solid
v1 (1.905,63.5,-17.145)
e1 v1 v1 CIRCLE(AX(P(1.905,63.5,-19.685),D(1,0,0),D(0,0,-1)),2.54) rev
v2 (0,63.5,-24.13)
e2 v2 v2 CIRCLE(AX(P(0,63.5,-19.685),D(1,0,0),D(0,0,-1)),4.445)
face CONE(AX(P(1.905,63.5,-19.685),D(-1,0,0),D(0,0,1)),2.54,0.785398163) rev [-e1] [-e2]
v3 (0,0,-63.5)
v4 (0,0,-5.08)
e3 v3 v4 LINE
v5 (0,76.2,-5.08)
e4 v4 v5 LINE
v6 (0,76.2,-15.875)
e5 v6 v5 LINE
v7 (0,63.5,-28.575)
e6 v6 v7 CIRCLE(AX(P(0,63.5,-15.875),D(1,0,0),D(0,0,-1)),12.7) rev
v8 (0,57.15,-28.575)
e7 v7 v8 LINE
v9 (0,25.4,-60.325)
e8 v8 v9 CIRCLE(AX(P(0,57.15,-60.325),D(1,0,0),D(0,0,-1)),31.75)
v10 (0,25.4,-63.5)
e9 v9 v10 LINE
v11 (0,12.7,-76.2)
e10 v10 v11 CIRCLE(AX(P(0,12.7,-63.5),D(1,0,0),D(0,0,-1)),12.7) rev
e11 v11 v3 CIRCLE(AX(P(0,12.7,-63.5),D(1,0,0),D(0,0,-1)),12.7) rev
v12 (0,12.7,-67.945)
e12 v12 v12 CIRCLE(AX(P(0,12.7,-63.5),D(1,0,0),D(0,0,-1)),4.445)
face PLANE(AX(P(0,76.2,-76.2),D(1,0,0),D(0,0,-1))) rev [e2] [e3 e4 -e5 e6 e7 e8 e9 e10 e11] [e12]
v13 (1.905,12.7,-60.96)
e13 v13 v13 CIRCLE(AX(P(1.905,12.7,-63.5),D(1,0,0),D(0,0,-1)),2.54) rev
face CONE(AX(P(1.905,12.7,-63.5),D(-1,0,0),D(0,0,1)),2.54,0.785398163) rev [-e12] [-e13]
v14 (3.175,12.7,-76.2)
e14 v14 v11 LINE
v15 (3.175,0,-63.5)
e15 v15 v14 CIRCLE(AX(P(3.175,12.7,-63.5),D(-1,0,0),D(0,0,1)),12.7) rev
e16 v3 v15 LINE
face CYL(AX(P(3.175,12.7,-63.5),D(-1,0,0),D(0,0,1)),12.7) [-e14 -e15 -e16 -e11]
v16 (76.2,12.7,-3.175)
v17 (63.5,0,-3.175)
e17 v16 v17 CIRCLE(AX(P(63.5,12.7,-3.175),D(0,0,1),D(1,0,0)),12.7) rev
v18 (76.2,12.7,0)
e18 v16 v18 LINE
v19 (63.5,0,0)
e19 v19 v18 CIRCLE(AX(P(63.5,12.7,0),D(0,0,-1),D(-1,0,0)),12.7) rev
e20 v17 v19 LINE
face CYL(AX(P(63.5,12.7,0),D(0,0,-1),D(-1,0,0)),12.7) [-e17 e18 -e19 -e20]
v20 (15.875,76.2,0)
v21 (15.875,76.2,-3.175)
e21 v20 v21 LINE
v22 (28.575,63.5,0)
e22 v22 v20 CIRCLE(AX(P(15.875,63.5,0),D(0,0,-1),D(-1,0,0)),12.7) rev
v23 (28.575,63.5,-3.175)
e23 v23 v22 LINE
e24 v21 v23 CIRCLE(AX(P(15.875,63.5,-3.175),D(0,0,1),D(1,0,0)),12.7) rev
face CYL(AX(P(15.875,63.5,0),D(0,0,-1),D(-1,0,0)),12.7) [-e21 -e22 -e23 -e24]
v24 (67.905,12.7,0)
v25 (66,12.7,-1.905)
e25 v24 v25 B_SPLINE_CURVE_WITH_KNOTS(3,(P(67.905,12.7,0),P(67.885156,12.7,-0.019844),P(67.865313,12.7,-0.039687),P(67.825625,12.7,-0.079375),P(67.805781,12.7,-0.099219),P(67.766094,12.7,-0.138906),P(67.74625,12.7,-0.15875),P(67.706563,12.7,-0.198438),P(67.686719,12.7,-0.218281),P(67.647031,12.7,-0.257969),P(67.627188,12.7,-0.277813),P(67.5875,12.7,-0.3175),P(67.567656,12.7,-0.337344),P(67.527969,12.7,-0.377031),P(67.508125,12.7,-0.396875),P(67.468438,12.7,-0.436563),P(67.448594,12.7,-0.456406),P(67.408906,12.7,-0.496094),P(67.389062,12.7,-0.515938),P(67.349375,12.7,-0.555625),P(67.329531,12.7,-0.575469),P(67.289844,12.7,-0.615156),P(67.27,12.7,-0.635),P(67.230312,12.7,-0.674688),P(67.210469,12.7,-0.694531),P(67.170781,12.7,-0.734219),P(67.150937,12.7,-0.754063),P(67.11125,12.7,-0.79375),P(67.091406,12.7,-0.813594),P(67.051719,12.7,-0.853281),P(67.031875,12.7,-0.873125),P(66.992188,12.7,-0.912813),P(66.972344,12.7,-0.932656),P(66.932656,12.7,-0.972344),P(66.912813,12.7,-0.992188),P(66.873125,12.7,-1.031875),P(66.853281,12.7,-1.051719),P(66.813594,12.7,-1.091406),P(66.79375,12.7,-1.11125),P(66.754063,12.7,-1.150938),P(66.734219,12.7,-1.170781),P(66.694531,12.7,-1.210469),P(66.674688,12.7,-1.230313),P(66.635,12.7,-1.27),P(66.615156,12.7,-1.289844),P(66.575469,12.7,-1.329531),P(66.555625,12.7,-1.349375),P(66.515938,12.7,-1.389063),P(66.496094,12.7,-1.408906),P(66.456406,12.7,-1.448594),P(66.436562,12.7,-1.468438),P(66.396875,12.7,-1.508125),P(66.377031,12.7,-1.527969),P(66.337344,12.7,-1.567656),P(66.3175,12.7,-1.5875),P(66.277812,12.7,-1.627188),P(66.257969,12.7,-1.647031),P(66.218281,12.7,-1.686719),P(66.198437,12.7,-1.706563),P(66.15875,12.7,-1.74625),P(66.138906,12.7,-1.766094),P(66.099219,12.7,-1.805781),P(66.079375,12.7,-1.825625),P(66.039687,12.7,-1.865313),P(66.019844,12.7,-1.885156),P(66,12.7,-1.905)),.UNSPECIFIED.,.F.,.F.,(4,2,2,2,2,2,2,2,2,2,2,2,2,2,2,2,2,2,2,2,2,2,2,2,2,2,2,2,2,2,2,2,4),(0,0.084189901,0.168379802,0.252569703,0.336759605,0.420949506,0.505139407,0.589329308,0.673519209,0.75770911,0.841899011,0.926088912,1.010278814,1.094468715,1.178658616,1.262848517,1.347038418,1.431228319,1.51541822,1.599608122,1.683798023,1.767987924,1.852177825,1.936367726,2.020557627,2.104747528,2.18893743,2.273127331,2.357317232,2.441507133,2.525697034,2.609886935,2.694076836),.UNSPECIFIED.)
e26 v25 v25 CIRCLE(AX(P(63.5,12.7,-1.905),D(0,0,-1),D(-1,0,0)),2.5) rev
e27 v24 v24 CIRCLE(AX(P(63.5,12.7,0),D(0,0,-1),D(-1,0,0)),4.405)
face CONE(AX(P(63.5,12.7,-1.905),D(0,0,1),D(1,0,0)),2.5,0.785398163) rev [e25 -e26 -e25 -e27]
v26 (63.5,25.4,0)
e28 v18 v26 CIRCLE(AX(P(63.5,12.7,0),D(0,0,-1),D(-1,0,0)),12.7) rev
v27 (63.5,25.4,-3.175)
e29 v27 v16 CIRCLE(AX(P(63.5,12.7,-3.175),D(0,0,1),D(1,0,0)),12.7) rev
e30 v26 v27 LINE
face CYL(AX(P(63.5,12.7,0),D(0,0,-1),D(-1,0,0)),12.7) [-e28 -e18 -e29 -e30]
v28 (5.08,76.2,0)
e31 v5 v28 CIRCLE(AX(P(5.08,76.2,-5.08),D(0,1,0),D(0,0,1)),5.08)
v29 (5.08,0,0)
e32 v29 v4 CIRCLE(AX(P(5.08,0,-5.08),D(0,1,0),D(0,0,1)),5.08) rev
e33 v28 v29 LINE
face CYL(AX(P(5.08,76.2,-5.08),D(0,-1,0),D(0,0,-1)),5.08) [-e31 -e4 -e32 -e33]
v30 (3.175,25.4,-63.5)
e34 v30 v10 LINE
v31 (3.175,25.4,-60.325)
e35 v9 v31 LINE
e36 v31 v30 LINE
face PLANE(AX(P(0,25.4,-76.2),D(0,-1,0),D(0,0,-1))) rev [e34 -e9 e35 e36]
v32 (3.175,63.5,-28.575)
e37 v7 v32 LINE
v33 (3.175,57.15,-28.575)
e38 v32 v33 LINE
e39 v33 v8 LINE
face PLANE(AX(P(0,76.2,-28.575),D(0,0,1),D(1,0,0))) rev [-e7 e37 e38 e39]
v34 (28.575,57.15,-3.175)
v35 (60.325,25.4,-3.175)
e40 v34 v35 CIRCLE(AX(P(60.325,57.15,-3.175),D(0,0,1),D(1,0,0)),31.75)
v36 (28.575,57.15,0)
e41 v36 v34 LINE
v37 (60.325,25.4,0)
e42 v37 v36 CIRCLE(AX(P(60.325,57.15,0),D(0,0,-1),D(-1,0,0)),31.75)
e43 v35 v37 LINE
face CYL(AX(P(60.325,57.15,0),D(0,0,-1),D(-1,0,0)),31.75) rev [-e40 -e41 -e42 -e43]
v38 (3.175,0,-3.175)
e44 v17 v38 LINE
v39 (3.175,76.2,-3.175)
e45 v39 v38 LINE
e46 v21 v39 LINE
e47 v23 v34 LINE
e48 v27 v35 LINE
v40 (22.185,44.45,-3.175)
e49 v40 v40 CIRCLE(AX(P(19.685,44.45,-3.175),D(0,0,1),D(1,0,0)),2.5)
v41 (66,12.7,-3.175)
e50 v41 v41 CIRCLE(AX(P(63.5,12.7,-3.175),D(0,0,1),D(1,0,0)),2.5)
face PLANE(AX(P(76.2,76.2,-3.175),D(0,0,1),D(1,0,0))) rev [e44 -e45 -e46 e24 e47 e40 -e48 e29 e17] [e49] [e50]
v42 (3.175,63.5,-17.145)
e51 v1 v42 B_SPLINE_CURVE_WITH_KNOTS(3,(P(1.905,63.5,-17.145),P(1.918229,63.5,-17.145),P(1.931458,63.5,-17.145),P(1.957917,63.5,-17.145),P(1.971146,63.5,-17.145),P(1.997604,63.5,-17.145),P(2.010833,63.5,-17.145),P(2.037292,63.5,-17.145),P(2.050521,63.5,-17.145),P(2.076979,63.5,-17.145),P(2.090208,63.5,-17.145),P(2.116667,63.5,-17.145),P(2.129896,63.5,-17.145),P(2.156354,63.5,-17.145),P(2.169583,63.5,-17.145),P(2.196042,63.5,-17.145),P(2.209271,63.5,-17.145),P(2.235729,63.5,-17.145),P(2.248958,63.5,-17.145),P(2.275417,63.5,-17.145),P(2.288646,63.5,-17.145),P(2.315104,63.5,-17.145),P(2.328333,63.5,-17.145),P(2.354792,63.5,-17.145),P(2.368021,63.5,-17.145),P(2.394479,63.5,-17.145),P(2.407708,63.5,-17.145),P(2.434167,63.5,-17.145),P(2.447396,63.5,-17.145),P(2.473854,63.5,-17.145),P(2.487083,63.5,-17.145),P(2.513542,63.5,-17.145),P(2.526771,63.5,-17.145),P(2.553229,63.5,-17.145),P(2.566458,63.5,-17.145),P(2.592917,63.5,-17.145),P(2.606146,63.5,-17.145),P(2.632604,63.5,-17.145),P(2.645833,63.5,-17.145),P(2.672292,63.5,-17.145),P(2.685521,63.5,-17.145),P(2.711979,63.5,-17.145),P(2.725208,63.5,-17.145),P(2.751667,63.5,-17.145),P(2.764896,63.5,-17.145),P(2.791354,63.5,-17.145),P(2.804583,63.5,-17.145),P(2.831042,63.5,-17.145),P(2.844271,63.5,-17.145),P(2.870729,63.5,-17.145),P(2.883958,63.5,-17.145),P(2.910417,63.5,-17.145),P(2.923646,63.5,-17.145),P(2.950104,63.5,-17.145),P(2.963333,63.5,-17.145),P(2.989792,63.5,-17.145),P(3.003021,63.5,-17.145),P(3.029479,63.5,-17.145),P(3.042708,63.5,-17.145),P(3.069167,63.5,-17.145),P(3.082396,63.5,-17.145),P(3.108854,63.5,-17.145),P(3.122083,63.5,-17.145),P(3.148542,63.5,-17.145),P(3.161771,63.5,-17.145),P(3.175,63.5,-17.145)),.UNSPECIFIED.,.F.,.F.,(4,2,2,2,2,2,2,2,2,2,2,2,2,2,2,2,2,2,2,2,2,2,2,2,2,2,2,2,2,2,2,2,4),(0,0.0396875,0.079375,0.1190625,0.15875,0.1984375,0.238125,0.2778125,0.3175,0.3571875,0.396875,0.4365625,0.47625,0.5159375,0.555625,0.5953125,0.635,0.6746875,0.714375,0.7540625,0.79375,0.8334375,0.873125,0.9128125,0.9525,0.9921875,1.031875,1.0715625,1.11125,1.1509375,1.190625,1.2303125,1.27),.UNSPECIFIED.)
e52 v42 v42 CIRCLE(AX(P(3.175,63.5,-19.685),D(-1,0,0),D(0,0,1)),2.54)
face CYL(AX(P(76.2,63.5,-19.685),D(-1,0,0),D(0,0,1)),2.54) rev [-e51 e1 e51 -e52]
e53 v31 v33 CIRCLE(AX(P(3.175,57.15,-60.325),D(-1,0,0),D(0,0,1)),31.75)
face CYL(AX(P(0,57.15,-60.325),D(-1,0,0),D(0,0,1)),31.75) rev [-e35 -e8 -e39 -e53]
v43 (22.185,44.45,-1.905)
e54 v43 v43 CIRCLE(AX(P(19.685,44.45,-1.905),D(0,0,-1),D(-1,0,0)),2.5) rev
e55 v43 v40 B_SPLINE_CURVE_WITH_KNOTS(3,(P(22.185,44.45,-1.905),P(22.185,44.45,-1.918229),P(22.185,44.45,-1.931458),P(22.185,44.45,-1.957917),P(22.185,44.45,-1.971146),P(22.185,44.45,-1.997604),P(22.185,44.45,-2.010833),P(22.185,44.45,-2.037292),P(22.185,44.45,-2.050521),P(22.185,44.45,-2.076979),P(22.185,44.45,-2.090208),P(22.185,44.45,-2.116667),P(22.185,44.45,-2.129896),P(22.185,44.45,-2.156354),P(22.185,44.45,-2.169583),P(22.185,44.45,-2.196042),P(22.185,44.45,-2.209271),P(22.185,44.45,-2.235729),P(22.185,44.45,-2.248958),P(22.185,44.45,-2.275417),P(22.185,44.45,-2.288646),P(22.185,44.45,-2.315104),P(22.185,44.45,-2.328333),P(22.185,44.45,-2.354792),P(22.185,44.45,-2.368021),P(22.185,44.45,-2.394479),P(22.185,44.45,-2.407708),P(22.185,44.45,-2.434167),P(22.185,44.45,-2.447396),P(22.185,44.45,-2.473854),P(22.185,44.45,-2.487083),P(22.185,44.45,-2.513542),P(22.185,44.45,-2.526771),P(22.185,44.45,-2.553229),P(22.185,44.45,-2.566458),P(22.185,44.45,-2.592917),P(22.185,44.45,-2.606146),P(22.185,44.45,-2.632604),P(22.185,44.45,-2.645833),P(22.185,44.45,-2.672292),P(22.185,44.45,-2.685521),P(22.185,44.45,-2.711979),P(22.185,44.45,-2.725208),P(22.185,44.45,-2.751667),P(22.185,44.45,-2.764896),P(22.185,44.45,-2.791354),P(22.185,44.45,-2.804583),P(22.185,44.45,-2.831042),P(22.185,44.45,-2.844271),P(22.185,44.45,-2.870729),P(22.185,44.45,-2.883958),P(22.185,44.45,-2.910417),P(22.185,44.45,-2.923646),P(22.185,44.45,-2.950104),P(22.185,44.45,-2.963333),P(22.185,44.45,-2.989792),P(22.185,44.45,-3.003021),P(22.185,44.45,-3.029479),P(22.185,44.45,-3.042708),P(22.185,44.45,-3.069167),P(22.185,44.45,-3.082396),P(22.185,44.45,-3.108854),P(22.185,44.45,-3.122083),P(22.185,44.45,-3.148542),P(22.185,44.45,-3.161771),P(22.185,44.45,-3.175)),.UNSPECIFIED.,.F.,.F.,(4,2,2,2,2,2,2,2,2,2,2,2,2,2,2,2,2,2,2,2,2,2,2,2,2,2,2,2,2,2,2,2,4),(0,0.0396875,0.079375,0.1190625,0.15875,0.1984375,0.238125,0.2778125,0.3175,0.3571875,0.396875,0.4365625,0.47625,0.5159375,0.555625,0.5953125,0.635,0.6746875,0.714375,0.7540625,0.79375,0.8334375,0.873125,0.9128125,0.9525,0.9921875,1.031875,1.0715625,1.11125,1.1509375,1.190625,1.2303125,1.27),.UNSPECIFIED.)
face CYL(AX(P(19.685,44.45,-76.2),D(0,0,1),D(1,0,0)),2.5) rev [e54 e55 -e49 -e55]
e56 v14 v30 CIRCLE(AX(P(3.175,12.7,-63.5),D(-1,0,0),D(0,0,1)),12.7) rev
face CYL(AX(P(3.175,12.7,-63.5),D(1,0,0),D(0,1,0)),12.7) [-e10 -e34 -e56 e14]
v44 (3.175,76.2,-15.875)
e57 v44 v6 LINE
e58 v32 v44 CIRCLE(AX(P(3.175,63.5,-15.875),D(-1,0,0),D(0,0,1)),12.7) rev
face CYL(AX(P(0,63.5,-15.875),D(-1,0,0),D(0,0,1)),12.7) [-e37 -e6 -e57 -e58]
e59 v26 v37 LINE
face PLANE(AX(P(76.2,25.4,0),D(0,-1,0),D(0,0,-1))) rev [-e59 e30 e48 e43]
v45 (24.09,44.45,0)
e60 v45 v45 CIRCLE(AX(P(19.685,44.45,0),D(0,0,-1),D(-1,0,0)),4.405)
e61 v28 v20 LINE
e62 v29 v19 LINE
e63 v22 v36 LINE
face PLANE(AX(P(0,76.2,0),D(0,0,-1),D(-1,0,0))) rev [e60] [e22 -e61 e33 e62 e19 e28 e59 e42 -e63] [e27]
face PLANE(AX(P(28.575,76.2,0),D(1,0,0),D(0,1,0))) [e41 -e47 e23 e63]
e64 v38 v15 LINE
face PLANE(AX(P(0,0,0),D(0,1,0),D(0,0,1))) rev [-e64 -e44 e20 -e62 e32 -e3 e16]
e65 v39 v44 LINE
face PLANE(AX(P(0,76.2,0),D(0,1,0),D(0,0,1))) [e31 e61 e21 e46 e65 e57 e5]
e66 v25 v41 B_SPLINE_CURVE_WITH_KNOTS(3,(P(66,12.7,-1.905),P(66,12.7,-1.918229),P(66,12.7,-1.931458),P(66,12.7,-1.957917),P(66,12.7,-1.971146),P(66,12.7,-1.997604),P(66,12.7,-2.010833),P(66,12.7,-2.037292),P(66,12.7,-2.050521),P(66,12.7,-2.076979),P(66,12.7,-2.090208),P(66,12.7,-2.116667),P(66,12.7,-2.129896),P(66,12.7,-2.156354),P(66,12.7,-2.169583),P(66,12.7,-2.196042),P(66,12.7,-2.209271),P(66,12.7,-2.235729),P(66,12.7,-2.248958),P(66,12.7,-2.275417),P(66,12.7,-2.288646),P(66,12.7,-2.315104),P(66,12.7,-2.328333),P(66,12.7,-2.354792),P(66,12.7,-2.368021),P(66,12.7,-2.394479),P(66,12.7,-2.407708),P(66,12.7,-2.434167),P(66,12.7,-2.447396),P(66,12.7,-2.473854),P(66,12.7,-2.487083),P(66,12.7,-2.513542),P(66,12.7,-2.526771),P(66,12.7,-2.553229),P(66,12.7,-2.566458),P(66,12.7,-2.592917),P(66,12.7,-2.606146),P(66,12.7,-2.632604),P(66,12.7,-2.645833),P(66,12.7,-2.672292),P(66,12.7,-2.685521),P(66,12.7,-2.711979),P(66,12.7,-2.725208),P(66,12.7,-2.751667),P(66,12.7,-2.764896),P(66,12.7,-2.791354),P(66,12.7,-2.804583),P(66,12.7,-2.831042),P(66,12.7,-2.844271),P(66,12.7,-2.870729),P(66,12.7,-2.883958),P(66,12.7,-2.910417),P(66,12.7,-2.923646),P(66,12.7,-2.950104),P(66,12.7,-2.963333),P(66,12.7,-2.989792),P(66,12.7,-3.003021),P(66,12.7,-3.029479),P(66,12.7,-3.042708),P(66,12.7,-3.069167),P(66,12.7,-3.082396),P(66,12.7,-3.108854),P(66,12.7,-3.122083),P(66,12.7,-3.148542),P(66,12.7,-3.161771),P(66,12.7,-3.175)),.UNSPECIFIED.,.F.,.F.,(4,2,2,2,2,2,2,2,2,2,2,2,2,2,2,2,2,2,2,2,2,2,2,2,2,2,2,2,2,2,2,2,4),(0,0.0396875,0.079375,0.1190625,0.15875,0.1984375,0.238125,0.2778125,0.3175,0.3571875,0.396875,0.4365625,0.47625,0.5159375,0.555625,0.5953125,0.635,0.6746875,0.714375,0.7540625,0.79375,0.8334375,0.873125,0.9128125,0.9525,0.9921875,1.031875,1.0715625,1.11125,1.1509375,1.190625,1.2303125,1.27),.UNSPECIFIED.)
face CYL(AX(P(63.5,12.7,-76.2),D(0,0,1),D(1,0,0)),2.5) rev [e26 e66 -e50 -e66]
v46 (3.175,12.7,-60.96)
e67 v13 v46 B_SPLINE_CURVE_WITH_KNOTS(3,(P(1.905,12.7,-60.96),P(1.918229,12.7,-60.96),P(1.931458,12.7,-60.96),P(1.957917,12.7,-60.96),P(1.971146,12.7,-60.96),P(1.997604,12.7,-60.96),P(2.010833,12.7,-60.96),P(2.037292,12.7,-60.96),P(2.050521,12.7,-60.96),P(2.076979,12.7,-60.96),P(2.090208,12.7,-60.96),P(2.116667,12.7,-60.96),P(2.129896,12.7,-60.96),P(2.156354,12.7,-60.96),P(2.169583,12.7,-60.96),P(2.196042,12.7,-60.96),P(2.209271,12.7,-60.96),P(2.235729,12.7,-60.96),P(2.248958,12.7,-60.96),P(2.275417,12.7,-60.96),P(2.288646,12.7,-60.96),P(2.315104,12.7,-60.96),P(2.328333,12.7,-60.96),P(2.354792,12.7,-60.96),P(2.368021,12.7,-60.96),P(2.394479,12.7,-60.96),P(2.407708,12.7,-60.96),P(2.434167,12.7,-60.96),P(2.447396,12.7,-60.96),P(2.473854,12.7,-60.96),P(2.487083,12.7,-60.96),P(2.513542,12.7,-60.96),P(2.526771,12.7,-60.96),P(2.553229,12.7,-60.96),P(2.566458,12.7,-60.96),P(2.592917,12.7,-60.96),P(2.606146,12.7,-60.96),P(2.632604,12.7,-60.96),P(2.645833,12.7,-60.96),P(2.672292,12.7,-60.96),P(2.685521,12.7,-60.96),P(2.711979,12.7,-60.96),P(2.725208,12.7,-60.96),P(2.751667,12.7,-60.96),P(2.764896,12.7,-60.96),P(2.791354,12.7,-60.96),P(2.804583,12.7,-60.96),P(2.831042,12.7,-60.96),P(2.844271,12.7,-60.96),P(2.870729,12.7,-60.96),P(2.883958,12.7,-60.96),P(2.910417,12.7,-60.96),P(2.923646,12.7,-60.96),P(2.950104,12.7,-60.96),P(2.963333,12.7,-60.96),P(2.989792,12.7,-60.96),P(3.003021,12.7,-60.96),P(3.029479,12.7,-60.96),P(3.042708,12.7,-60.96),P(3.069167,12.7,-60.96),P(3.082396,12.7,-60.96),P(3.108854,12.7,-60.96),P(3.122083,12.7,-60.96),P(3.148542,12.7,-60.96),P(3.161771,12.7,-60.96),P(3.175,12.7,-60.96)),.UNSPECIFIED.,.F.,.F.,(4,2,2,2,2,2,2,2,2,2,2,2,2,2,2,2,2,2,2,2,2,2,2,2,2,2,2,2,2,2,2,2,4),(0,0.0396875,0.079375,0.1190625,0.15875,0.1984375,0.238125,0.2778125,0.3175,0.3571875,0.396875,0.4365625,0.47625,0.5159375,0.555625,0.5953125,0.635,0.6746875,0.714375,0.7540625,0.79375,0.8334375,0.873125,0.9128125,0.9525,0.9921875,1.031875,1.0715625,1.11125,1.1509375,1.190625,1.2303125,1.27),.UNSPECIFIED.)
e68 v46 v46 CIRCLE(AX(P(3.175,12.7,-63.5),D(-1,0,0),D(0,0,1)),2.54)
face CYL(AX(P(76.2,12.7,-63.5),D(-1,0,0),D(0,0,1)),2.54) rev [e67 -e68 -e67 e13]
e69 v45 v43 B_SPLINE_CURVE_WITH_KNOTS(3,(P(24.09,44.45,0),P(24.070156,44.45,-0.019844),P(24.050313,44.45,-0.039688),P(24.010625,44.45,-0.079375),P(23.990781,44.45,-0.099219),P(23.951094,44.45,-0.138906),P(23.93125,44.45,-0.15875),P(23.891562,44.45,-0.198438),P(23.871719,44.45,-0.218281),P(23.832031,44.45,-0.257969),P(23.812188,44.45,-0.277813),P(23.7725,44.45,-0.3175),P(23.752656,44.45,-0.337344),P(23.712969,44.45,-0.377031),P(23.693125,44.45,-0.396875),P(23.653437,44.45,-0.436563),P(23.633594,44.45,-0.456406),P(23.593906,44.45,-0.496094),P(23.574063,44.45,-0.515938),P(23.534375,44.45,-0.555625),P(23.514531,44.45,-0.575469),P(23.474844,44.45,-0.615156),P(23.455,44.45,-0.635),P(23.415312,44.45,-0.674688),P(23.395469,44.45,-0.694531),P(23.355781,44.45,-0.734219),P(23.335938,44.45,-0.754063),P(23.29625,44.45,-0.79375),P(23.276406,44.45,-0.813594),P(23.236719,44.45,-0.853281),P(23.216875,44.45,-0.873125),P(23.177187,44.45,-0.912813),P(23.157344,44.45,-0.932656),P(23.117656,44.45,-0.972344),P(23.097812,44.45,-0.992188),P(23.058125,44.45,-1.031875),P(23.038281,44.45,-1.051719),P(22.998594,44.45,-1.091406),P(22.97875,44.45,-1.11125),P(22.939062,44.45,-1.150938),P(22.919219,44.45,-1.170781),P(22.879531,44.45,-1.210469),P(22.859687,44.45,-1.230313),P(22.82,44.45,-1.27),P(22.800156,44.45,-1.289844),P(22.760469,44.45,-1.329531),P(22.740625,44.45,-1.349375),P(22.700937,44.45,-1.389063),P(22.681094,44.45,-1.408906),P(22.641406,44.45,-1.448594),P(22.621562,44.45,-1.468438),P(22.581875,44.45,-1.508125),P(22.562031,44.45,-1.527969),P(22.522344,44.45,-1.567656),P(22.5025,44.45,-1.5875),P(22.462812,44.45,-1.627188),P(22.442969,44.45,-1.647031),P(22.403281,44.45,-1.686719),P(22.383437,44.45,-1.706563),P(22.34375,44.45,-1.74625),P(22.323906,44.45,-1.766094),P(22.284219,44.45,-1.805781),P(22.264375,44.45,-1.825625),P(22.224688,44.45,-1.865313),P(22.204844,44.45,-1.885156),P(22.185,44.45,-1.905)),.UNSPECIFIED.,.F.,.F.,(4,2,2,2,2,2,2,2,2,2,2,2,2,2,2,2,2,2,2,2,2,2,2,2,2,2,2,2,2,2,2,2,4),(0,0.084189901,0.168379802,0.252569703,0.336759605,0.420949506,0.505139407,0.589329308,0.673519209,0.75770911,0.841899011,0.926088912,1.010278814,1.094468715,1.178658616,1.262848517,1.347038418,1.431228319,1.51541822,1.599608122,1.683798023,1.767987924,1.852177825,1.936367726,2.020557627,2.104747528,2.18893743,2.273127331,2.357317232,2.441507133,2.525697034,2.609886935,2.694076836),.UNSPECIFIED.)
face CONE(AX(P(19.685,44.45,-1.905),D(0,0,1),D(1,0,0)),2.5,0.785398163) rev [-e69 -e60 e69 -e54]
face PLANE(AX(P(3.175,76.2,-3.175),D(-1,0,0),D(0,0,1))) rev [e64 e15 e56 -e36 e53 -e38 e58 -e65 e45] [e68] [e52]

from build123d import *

# Parameters (mm, degrees)
BOSS_EXTRUDE1_DEPTH = 76.2
SKETCH2_W           = 47.625
SKETCH2_H           = 50.8
CUT_EXTRUDE1_DEPTH  = 131.175
SKETCH3_W           = 47.625
SKETCH3_H           = 50.8
CUT_EXTRUDE2_DEPTH  = 131.175
FILLET1_R           = 5.08
FILLET2_R           = 12.7
SKETCH4_R           = 2.5
CUT_EXTRUDE3_DEPTH  = 132.982271537
SKETCH5_R           = 2.54
CUT_EXTRUDE4_DEPTH  = 132.982271537
CHAMFER1_SIZE       = 1.905
FILLET3_R           = 31.75


with BuildPart() as part:
    # Sketch1 → Boss-Extrude1 (new body)
    with BuildSketch(Plane(origin=(0, 0, 0), x_dir=(1, 0, 0), z_dir=(0, 1, 0))):
        Polygon((0, 76.2), (0, 0), (76.2, 0), (76.2, 3.175), (3.175, 3.175), (3.175, 76.2), align=None)
    extrude(amount=BOSS_EXTRUDE1_DEPTH)

    # Sketch2 → Cut-Extrude1 (cut, through all)
    with BuildSketch(Plane(origin=(0, 0, -3.175), x_dir=(-1, 0, 0), z_dir=(0, 0, -1))):
        with Locations((-52.3875, 50.8)):
            Rectangle(SKETCH2_W, SKETCH2_H)
    extrude(amount=-CUT_EXTRUDE1_DEPTH, mode=Mode.SUBTRACT)

    # Sketch3 → Cut-Extrude2 (cut, through all)
    with BuildSketch(Plane(origin=(3.175, 0, 0), x_dir=(0, 0, -1), z_dir=(1, 0, 0))):
        with Locations((52.3875, 50.8)):
            Rectangle(SKETCH3_W, SKETCH3_H)
    extrude(amount=-CUT_EXTRUDE2_DEPTH, mode=Mode.SUBTRACT)

    # Fillet1
    fillet1_edges = [part.edges().sort_by_distance(p)[0] for p in [
        (0, 38.1, 0),
    ]]
    fillet(fillet1_edges, radius=FILLET1_R)

    # Fillet2
    fillet2_edges = [part.edges().sort_by_distance(p)[0] for p in [
        (1.5875, 76.2, -28.575),
        (1.5875, 25.4, -76.2),
        (1.5875, 0, -76.2),
        (76.2, 0, -1.5875),
        (76.2, 25.4, -1.5875),
        (28.575, 76.2, -1.5875),
    ]]
    fillet(fillet2_edges, radius=FILLET2_R - 0.0001)  # a hair under: the kernel refuses the full size

    # Sketch4 → Cut-Extrude3 (cut, through all)
    with BuildSketch(Plane.XY):
        with Locations((63.5, 12.7)):
            Circle(SKETCH4_R)
        with Locations((19.685, 44.45)):
            Circle(SKETCH4_R)
    extrude(amount=-CUT_EXTRUDE3_DEPTH, mode=Mode.SUBTRACT)

    # Sketch5 → Cut-Extrude4 (cut, through all)
    with BuildSketch(Plane.ZY):
        with Locations((-63.5, 12.7)):
            Circle(SKETCH5_R)
        with Locations((-19.685, 63.5)):
            Circle(SKETCH5_R)
    extrude(amount=-CUT_EXTRUDE4_DEPTH, mode=Mode.SUBTRACT)

    # Chamfer1
    chamfer1_edges = [part.edges().sort_by_distance(p)[0] for p in [
        (0, 63.5, -22.225),
        (61, 12.7, 0),
        (17.185, 44.45, 0),
        (0, 12.7, -66.04),
    ]]
    chamfer(chamfer1_edges, length=CHAMFER1_SIZE)

    # Fillet3
    fillet3_edges = [part.edges().sort_by_distance(p)[0] for p in [
        (28.575, 25.4, -1.5875),
        (1.5875, 25.4, -28.575),
    ]]
    fillet(fillet3_edges, radius=FILLET3_R)


solid = part.part
